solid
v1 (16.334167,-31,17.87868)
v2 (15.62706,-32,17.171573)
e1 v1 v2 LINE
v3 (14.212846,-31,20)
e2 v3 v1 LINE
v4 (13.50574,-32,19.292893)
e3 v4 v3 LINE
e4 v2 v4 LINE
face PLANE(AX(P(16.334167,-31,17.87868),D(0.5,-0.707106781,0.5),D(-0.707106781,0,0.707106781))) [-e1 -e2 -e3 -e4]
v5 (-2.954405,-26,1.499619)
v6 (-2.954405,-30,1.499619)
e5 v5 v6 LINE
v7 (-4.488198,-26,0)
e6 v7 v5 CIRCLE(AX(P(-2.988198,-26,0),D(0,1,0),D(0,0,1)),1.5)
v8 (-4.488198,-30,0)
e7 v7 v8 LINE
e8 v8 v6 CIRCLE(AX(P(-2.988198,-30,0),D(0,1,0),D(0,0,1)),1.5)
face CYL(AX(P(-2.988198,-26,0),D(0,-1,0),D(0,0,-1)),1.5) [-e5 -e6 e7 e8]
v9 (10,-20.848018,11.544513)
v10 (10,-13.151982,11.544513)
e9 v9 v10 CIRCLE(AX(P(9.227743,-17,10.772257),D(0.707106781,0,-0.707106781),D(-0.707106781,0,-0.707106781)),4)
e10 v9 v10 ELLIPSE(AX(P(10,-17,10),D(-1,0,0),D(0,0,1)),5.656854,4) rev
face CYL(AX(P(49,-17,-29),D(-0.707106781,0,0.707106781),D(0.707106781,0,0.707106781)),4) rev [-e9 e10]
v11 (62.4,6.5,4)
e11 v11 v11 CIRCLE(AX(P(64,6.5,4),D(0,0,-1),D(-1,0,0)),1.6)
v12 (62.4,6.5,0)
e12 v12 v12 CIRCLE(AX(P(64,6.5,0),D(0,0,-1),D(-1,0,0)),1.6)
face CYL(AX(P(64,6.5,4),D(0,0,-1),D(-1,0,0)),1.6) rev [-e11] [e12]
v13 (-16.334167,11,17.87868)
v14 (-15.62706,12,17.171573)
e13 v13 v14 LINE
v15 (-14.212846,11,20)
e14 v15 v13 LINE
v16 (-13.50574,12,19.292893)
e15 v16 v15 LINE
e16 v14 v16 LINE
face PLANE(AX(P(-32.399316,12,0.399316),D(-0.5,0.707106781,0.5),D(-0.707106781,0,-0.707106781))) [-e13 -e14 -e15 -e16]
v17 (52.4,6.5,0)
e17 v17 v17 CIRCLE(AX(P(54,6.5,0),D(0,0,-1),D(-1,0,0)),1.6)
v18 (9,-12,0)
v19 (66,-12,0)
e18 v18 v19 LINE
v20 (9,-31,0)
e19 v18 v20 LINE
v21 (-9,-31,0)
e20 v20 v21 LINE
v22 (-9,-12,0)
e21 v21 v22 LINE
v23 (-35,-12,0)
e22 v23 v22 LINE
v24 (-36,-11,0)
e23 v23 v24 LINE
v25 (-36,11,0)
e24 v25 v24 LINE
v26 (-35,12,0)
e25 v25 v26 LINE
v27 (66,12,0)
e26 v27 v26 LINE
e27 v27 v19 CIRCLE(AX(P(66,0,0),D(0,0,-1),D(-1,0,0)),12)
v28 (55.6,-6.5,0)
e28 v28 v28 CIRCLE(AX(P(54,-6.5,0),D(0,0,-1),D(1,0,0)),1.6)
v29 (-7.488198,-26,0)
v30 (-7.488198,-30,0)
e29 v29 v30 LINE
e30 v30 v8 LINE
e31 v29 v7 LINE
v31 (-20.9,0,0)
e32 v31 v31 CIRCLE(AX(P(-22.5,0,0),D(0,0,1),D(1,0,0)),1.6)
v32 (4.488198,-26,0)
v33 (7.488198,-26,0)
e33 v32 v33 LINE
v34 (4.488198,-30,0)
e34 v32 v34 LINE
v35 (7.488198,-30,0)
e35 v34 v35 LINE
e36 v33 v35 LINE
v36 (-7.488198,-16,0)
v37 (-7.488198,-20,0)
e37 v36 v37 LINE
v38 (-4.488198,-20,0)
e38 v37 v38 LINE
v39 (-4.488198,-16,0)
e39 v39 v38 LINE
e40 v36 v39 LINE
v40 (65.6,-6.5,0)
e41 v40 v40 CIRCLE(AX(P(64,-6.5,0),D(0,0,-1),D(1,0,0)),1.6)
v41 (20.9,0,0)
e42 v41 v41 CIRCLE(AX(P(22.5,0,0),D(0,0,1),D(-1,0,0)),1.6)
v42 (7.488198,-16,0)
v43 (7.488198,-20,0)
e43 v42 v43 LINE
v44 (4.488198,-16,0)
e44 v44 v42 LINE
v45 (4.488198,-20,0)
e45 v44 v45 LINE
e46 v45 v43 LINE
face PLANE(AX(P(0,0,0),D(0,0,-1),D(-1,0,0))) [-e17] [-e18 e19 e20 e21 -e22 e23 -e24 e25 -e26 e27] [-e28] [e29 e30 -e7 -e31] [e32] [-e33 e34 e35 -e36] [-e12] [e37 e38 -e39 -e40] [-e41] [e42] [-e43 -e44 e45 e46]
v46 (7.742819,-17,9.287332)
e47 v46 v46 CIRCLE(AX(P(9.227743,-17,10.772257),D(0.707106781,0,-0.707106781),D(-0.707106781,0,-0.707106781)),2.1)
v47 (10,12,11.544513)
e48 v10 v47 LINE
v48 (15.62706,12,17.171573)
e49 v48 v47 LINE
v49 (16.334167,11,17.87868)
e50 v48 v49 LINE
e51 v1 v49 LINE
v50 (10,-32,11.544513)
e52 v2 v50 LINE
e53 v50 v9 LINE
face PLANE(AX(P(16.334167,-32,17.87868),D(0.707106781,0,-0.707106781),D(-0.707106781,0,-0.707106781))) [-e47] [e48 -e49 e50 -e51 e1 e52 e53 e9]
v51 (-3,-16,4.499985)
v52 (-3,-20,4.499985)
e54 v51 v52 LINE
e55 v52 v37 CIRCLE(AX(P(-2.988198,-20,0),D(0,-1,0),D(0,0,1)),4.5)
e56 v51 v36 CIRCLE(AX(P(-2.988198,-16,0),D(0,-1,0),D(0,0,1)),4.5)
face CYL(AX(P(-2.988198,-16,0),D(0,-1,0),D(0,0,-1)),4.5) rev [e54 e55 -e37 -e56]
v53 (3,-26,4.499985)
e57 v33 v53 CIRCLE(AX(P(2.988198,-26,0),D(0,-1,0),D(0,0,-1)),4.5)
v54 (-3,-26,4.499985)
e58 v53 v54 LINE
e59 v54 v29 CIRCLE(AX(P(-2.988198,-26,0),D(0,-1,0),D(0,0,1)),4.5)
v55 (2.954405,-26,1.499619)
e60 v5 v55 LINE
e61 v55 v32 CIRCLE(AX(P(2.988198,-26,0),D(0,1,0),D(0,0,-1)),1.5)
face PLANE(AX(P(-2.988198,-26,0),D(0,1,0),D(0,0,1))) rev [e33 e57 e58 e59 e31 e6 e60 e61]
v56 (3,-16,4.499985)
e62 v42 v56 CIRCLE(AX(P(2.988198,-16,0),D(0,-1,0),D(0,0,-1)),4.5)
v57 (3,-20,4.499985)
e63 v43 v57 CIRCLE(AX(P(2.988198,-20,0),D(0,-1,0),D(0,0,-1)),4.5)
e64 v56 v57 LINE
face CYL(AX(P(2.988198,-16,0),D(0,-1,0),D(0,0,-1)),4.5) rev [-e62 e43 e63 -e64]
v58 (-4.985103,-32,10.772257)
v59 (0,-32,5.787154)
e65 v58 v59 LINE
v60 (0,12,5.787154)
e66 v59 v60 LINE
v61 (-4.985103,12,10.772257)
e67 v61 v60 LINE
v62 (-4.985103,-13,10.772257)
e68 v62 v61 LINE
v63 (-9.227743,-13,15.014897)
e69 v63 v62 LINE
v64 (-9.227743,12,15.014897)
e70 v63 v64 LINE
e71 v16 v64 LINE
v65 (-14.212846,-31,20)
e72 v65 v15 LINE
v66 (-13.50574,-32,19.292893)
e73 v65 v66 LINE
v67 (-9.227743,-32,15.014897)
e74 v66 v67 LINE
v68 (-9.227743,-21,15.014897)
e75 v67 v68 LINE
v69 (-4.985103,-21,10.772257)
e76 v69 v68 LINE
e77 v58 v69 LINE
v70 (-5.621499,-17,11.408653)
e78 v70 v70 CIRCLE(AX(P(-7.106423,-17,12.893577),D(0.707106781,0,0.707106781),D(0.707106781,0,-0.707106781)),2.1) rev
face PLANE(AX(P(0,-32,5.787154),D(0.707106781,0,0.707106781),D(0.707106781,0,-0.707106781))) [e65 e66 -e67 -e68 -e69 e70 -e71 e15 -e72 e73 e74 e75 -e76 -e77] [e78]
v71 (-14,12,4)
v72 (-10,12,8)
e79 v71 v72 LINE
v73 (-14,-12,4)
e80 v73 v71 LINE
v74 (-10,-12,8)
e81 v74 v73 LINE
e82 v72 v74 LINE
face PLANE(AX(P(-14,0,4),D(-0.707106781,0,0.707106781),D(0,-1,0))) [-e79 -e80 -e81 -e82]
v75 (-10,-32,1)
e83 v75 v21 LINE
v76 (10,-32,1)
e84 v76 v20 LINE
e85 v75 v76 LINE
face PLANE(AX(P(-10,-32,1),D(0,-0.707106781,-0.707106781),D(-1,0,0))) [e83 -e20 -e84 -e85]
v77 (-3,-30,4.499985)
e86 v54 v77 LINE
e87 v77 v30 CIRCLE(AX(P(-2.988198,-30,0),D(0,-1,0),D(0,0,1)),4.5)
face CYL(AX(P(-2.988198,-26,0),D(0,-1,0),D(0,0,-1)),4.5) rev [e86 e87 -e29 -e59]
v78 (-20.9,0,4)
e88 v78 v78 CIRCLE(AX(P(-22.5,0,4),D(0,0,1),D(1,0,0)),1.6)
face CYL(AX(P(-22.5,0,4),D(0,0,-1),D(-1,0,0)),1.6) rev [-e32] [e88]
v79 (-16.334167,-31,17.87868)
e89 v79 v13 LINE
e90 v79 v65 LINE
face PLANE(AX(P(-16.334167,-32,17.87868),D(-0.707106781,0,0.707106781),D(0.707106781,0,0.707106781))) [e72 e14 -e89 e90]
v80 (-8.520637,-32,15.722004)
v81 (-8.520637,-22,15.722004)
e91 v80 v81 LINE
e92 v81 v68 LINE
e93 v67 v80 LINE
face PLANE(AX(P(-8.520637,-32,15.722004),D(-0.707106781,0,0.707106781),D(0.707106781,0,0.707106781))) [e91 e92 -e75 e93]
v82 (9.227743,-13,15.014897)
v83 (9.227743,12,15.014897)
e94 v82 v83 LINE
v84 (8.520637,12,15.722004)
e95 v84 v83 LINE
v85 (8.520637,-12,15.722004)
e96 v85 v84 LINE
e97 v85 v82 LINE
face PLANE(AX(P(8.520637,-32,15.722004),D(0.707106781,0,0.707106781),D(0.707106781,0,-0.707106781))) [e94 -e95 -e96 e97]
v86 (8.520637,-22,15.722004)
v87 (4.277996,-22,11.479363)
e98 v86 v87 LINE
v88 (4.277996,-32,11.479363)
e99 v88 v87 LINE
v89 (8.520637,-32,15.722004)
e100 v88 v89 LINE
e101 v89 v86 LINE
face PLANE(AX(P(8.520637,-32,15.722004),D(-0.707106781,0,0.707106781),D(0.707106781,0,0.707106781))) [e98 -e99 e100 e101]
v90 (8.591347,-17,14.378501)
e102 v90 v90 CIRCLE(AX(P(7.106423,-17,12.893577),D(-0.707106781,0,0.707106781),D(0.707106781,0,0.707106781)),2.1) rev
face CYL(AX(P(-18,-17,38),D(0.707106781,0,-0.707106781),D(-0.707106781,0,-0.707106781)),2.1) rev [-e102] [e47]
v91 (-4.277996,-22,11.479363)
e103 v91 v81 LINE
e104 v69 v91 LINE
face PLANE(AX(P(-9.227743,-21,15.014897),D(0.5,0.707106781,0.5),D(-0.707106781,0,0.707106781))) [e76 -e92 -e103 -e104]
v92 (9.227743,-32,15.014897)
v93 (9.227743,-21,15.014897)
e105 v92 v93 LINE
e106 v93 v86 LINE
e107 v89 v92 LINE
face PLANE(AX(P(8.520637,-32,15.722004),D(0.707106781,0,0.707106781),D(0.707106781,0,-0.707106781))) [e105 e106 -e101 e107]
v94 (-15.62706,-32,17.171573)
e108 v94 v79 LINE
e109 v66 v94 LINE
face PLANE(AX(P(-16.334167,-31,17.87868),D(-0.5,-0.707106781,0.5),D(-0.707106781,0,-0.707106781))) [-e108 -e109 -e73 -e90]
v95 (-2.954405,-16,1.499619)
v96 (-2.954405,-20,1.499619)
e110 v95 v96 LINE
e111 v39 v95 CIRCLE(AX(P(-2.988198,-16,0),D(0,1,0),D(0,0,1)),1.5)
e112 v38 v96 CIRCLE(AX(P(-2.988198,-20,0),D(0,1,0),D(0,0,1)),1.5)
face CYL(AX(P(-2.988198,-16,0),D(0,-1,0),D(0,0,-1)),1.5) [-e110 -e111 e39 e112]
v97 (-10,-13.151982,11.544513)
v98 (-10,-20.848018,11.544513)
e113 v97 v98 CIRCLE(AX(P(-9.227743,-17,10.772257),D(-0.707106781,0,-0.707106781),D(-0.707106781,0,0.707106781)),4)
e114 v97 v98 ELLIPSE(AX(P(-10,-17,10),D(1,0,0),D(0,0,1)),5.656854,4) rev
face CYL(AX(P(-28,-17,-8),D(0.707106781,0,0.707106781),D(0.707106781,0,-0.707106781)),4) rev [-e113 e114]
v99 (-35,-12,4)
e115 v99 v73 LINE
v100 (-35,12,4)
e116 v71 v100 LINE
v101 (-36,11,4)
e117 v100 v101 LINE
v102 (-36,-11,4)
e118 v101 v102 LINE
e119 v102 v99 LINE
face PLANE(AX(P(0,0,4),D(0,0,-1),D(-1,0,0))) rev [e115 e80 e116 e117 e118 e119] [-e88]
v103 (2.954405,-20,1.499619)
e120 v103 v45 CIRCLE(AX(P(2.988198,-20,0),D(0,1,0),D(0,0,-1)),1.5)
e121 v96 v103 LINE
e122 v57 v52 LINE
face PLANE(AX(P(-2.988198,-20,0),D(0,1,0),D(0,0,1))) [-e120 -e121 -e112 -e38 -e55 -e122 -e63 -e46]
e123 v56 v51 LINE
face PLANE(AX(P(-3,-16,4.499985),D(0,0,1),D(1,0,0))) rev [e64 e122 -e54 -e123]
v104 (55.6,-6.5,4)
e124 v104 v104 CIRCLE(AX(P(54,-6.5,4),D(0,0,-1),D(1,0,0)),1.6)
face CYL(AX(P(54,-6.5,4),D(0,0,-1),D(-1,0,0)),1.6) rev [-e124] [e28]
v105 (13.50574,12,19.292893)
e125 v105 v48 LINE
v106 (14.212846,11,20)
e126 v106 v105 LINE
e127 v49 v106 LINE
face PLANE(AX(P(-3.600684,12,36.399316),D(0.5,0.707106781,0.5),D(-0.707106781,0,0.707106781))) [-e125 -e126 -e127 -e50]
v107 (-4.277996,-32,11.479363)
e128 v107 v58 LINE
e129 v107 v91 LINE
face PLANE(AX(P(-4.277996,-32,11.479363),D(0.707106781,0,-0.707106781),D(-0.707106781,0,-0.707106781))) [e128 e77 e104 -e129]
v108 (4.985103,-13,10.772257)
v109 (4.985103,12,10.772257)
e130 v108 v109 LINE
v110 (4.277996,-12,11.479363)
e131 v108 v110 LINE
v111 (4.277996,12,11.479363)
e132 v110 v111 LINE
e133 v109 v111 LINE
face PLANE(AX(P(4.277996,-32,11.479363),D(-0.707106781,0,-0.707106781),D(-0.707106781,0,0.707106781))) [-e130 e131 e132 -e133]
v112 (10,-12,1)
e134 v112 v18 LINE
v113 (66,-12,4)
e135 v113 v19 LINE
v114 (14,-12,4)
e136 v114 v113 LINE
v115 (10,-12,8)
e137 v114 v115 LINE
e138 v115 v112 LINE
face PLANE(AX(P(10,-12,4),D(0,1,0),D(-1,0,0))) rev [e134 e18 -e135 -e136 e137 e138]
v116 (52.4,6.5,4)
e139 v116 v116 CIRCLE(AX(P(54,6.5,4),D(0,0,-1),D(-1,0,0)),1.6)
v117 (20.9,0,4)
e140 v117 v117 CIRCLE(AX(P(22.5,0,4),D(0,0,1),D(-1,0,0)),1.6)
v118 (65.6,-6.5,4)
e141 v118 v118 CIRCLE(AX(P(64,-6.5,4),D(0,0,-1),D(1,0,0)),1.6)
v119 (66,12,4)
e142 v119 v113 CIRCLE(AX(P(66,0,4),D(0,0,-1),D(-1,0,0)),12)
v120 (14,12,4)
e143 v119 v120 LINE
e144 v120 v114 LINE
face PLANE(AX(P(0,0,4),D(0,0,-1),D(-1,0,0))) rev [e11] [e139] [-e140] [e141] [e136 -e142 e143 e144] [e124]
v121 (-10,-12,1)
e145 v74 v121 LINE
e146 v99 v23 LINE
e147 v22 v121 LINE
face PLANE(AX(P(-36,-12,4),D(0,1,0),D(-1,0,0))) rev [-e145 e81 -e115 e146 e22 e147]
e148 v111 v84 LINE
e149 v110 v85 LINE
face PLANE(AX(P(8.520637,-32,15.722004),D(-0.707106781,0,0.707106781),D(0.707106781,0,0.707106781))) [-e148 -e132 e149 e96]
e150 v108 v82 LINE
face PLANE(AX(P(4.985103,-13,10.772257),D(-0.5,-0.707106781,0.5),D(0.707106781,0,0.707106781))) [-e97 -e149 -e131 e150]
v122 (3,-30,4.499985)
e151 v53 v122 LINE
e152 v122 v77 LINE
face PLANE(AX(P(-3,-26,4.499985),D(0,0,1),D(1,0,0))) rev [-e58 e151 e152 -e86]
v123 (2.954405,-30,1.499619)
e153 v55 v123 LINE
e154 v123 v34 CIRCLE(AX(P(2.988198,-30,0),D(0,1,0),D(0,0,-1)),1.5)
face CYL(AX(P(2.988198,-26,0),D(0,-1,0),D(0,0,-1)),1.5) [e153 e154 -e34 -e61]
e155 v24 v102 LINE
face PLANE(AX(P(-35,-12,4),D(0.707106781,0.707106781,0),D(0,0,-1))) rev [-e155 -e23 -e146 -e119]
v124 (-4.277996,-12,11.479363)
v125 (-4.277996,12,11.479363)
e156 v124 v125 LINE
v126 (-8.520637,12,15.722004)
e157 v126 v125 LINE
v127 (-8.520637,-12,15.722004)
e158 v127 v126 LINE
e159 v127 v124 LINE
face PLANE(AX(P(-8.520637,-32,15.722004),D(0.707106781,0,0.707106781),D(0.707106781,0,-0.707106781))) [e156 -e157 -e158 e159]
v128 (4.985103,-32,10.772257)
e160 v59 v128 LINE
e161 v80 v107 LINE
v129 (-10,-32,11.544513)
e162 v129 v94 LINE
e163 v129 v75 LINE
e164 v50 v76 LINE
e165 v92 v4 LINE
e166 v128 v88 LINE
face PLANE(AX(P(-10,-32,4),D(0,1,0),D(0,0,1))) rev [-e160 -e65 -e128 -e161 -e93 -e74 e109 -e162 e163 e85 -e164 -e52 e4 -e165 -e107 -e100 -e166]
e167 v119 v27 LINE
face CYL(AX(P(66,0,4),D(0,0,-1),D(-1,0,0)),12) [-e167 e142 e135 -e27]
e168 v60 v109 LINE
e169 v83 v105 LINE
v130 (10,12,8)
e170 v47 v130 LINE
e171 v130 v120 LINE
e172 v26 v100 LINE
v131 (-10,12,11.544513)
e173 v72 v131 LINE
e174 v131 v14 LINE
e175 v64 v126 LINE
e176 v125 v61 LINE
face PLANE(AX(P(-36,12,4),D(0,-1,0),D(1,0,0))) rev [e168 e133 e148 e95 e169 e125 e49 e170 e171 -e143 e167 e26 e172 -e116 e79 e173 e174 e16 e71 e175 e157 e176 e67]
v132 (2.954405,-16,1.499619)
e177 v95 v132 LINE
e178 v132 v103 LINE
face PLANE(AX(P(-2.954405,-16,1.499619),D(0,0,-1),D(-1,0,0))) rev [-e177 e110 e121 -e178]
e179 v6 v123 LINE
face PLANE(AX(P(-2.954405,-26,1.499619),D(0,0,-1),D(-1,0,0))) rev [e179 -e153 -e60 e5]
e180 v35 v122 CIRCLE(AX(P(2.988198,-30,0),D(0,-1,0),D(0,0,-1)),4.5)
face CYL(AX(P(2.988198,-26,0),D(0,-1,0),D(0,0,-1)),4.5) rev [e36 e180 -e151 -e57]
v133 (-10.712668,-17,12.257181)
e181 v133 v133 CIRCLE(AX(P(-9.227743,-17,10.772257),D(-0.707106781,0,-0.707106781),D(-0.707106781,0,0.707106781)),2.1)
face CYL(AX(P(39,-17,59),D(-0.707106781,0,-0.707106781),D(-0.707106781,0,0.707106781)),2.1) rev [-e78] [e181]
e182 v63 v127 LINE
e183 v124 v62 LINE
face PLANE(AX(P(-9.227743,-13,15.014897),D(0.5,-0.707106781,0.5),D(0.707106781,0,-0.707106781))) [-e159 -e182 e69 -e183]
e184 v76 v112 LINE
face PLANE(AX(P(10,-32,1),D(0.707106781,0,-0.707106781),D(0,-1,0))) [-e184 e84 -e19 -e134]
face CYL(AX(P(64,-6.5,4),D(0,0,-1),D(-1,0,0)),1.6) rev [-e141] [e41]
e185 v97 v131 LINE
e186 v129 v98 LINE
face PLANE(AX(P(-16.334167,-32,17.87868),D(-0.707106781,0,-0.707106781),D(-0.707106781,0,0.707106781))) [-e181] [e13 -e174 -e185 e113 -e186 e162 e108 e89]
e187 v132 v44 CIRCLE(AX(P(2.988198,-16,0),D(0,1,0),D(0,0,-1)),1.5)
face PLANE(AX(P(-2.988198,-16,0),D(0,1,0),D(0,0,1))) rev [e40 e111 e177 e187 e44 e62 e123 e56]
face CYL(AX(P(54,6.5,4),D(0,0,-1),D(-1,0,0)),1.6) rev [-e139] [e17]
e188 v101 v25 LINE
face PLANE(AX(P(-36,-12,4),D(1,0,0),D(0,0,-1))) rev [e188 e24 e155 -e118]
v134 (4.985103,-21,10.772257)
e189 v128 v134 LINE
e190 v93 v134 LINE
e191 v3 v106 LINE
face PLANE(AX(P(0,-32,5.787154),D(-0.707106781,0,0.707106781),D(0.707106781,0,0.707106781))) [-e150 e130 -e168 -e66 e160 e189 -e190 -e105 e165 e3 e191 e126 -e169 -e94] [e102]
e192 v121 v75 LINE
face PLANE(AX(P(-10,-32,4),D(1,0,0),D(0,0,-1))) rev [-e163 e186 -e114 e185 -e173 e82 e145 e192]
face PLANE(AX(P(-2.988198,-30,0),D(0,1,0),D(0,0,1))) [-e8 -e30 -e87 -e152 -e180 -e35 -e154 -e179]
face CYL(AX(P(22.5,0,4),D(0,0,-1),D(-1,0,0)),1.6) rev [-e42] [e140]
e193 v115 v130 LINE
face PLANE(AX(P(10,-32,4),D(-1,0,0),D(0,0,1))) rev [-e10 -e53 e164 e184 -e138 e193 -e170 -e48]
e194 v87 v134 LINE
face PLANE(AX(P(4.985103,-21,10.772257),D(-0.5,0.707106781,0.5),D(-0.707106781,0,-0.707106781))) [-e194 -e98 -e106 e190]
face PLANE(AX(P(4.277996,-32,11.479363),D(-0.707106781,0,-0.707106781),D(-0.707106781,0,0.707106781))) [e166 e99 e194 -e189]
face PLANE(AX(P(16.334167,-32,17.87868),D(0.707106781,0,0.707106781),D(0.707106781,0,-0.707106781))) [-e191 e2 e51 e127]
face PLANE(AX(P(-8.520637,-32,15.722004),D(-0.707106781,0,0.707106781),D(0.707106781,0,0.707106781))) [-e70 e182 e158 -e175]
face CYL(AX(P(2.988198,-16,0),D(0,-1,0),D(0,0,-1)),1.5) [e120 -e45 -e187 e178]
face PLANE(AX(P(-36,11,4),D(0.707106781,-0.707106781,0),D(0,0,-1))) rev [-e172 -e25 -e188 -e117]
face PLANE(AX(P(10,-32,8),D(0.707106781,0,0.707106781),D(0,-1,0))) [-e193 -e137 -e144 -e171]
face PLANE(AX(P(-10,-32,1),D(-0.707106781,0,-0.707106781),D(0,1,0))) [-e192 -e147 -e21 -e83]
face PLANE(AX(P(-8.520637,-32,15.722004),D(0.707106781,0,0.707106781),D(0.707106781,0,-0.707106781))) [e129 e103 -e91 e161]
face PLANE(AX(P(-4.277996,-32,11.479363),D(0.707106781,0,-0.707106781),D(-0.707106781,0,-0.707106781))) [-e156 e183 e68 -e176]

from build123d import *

# Parameters (mm, degrees)
CROQUIS1_R                 = 1.6
SALIENTE_EXTRUIR1_DEPTH    = 4
CROQUIS3_R                 = 1.6
SALIENTE_EXTRUIR3_DEPTH    = 4
SALIENTE_EXTRUIR4_DEPTH    = 44
CORTAR_EXTRUIR1_START      = -2
CORTAR_EXTRUIR1_DEPTH      = 4
MATRIZL1_COUNT             = 2
MATRIZL1_PITCH             = 10
CORTAR_EXTRUIR2_DEPTH      = 86.777797157
CORTAR_EXTRUIR2_DEPTH_BACK = 86.777797157
CROQUIS7_R                 = 2.1
CROQUIS8_R                 = 4
CORTAR_EXTRUIR3_DEPTH      = 86.777797157
CORTAR_EXTRUIR4_DEPTH      = 88.170949948
CORTAR_EXTRUIR4_DEPTH_BACK = 88.170949948
CROQUIS9_R                 = 2.1
CROQUIS10_R                = 4
CORTAR_EXTRUIR5_DEPTH      = 88.170949948
CHAFL_N1_SIZE              = 4
CHAFL_N2_SIZE              = 1
CROQUIS11_W                = 6
CROQUIS11_H                = 8
CORTAR_EXTRUIR6_DEPTH      = 1
CROQUIS12_W                = 6
CROQUIS12_H                = 8
CORTAR_EXTRUIR7_DEPTH      = 1
CHAFL_N3_SIZE              = 1


with BuildPart() as part:
    # Croquis1 → Saliente-Extruir1 (new body)
    with BuildSketch(Plane.XY):
        Polygon((10, -12), (36, -12), (36, 12), (-36, 12), (-36, -12), (-10, -12), (-10, -32), (10, -32), align=None)
        with Locations((-22.5, 0)):
            Circle(CROQUIS1_R, mode=Mode.SUBTRACT)
        with Locations(Location((22.5, 0, 0), (0, 0, 180))):
            Circle(CROQUIS1_R, mode=Mode.SUBTRACT)
    extrude(amount=SALIENTE_EXTRUIR1_DEPTH)

    # Croquis3 → Saliente-Extruir3 (add)
    with BuildSketch(Plane(origin=(0, 0, 0), x_dir=(-1, 0, 0), z_dir=(0, 0, -1))):
        with BuildLine():
            Line((-66, 12), (-36, 12))
            Line((-36, 12), (-36, -12))
            Line((-36, -12), (-66, -12))
            ThreePointArc((-66, -12), (-78, 0), (-66, 12))
        make_face()
        with Locations((-54, 6.5)):
            Circle(CROQUIS3_R, mode=Mode.SUBTRACT)
        with Locations((-64, 6.5)):
            Circle(CROQUIS3_R, mode=Mode.SUBTRACT)
        with Locations(Location((-54, -6.5, 0), (0, 0, 180))):
            Circle(CROQUIS3_R, mode=Mode.SUBTRACT)
        with Locations(Location((-64, -6.5, 0), (0, 0, 180))):
            Circle(CROQUIS3_R, mode=Mode.SUBTRACT)
    extrude(amount=-SALIENTE_EXTRUIR3_DEPTH)

    # Croquis5 → Saliente-Extruir4 (add, through all)
    with BuildSketch(Plane(origin=(0, 12, 0), x_dir=(1, 0, 0), z_dir=(0, 1, 0))):
        Polygon((-10, -11.544513011), (-10, -4), (10, -4), (10, -11.544513011), (16.334166645, -17.878679656), (14.212846302, -20), (9.227743494, -15.014897193), (8.520636713, -15.722003974), (4.277996026, -11.479363287), (4.985102807, -10.772256506), (0, -5.787153698), (-4.985102807, -10.772256506), (-4.277996026, -11.479363287), (-8.520636713, -15.722003974), (-9.227743494, -15.014897193), (-14.212846302, -20), (-16.334166645, -17.878679656), align=None)
    extrude(amount=-SALIENTE_EXTRUIR4_DEPTH)

    # Croquis6 → Cortar-Extruir1 (cut)
    with BuildSketch(Plane.XZ.offset(32).offset(CORTAR_EXTRUIR1_START)):
        with BuildLine():
            Line((-4.48819847, 0), (-7.48819847, 0))
            ThreePointArc((-7.48819847, 0), (-6.174348725, 3.177805305), (-3, 4.499984525))
            Line((-3, 4.499984525), (3, 4.499984525))
            ThreePointArc((3, 4.499984525), (6.174348725, 3.177805305), (7.48819847, 0))
            Line((7.48819847, 0), (4.48819847, 0))
            ThreePointArc((4.48819847, 0), (4.036842813, 1.072541394), (2.954405081, 1.499619287))
            Line((2.954405081, 1.499619287), (-2.954405081, 1.499619287))
            ThreePointArc((-2.954405081, 1.499619287), (-4.036842813, 1.072541394), (-4.48819847, 0))
        make_face()
    cortar_extruir1 = extrude(amount=-CORTAR_EXTRUIR1_DEPTH, mode=Mode.SUBTRACT)

    # MatrizL1: Cortar-Extruir1 ×2
    with Locations(*[(0, i * MATRIZL1_PITCH, 0) for i in range(1, MATRIZL1_COUNT)]):
        add(cortar_extruir1, mode=Mode.SUBTRACT)

    # Croquis7 → Cortar-Extruir2 (cut, two sides: drawn at the far end of the back side and taken through both)
    with BuildSketch(Plane(origin=(0.772256506, 0, 0.772256506), x_dir=(-0.7071067811865476, 0, 0.7071067811865476), z_dir=(-0.7071067811865476, 0, -0.7071067811865476)).offset(-CORTAR_EXTRUIR2_DEPTH_BACK)):
        with Locations(Location((14.142135624, -17, 0), (0, 0, 58.663416321))):
            Circle(CROQUIS7_R)
    extrude(amount=CORTAR_EXTRUIR2_DEPTH + CORTAR_EXTRUIR2_DEPTH_BACK, mode=Mode.SUBTRACT)

    # Croquis8 → Cortar-Extruir3 (cut, through all)
    with BuildSketch(Plane(origin=(0.772256506, 0, 0.772256506), x_dir=(-0.7071067811865476, 0, 0.7071067811865476), z_dir=(-0.7071067811865476, 0, -0.7071067811865476))):
        with Locations((14.142135624, -17)):
            Circle(CROQUIS8_R)
    extrude(amount=CORTAR_EXTRUIR3_DEPTH, mode=Mode.SUBTRACT)

    # Croquis9 → Cortar-Extruir4 (cut, two sides: drawn at the far end of the back side and taken through both)
    with BuildSketch(Plane(origin=(-0.772256506, 0, 0.772256506), x_dir=(-0.7071067811865476, 0, -0.7071067811865476), z_dir=(0.7071067811865476, 0, -0.7071067811865476)).offset(-CORTAR_EXTRUIR4_DEPTH_BACK)):
        with Locations(Location((-14.142135624, -17, 0), (0, 0, 238.663416321))):
            Circle(CROQUIS9_R)
    extrude(amount=CORTAR_EXTRUIR4_DEPTH + CORTAR_EXTRUIR4_DEPTH_BACK, mode=Mode.SUBTRACT)

    # Croquis10 → Cortar-Extruir5 (cut, through all)
    with BuildSketch(Plane(origin=(-0.772256506, 0, 0.772256506), x_dir=(-0.7071067811865476, 0, -0.7071067811865476), z_dir=(0.7071067811865476, 0, -0.7071067811865476))):
        with Locations((-14.142135624, -17)):
            Circle(CROQUIS10_R)
    extrude(amount=CORTAR_EXTRUIR5_DEPTH, mode=Mode.SUBTRACT)

    # Chaflán1
    chafl_n1_edges = [part.edges().sort_by_distance(p)[0] for p in [
        (-10, 0, 4),
        (10, 0, 4),
    ]]
    chamfer(chafl_n1_edges, length=CHAFL_N1_SIZE)

    # Chaflán2
    chafl_n2_edges = [part.edges().sort_by_distance(p)[0] for p in [
        (-36, -12, 2),
        (-36, 12, 2),
        (-15.273506474, -32, 18.939339828),
        (15.273506474, -32, 18.939339828),
        (15.273506474, 12, 18.939339828),
        (-15.273506474, 12, 18.939339828),
        (10, -22, 0),
        (0, -32, 0),
        (-10, -22, 0),
    ]]
    chamfer(chafl_n2_edges, length=CHAFL_N2_SIZE)

    # Croquis11 → Cortar-Extruir6 (cut)
    with BuildSketch(Plane(origin=(-3.60068363, 0, 3.60068363), x_dir=(0.7071067811865476, 0, 0.7071067811865476), z_dir=(-0.7071067811865476, 0, 0.7071067811865476))):
        with Locations((14.142135624, -17)):
            Rectangle(CROQUIS11_W, CROQUIS11_H)
    extrude(amount=-CORTAR_EXTRUIR6_DEPTH, mode=Mode.SUBTRACT)

    # Croquis12 → Cortar-Extruir7 (cut)
    with BuildSketch(Plane(origin=(3.60068363, 0, 3.60068363), x_dir=(0.7071067811865475, 0, -0.7071067811865477), z_dir=(0.7071067811865477, 0, 0.7071067811865475))):
        with Locations((-14.142135624, -17)):
            Rectangle(CROQUIS12_W, CROQUIS12_H)
    extrude(amount=-CORTAR_EXTRUIR7_DEPTH, mode=Mode.SUBTRACT)

    # Chaflán3
    chafl_n3_edges = [part.edges().sort_by_distance(p)[0] for p in [
        (-6.39931637, -21, 13.60068363),
        (6.39931637, -21, 13.60068363),
        (6.39931637, -13, 13.60068363),
        (-6.39931637, -13, 13.60068363),
    ]]
    chamfer(chafl_n3_edges, length=CHAFL_N3_SIZE - 0.0001)  # a hair under: the kernel refuses the full size


solid = part.part
